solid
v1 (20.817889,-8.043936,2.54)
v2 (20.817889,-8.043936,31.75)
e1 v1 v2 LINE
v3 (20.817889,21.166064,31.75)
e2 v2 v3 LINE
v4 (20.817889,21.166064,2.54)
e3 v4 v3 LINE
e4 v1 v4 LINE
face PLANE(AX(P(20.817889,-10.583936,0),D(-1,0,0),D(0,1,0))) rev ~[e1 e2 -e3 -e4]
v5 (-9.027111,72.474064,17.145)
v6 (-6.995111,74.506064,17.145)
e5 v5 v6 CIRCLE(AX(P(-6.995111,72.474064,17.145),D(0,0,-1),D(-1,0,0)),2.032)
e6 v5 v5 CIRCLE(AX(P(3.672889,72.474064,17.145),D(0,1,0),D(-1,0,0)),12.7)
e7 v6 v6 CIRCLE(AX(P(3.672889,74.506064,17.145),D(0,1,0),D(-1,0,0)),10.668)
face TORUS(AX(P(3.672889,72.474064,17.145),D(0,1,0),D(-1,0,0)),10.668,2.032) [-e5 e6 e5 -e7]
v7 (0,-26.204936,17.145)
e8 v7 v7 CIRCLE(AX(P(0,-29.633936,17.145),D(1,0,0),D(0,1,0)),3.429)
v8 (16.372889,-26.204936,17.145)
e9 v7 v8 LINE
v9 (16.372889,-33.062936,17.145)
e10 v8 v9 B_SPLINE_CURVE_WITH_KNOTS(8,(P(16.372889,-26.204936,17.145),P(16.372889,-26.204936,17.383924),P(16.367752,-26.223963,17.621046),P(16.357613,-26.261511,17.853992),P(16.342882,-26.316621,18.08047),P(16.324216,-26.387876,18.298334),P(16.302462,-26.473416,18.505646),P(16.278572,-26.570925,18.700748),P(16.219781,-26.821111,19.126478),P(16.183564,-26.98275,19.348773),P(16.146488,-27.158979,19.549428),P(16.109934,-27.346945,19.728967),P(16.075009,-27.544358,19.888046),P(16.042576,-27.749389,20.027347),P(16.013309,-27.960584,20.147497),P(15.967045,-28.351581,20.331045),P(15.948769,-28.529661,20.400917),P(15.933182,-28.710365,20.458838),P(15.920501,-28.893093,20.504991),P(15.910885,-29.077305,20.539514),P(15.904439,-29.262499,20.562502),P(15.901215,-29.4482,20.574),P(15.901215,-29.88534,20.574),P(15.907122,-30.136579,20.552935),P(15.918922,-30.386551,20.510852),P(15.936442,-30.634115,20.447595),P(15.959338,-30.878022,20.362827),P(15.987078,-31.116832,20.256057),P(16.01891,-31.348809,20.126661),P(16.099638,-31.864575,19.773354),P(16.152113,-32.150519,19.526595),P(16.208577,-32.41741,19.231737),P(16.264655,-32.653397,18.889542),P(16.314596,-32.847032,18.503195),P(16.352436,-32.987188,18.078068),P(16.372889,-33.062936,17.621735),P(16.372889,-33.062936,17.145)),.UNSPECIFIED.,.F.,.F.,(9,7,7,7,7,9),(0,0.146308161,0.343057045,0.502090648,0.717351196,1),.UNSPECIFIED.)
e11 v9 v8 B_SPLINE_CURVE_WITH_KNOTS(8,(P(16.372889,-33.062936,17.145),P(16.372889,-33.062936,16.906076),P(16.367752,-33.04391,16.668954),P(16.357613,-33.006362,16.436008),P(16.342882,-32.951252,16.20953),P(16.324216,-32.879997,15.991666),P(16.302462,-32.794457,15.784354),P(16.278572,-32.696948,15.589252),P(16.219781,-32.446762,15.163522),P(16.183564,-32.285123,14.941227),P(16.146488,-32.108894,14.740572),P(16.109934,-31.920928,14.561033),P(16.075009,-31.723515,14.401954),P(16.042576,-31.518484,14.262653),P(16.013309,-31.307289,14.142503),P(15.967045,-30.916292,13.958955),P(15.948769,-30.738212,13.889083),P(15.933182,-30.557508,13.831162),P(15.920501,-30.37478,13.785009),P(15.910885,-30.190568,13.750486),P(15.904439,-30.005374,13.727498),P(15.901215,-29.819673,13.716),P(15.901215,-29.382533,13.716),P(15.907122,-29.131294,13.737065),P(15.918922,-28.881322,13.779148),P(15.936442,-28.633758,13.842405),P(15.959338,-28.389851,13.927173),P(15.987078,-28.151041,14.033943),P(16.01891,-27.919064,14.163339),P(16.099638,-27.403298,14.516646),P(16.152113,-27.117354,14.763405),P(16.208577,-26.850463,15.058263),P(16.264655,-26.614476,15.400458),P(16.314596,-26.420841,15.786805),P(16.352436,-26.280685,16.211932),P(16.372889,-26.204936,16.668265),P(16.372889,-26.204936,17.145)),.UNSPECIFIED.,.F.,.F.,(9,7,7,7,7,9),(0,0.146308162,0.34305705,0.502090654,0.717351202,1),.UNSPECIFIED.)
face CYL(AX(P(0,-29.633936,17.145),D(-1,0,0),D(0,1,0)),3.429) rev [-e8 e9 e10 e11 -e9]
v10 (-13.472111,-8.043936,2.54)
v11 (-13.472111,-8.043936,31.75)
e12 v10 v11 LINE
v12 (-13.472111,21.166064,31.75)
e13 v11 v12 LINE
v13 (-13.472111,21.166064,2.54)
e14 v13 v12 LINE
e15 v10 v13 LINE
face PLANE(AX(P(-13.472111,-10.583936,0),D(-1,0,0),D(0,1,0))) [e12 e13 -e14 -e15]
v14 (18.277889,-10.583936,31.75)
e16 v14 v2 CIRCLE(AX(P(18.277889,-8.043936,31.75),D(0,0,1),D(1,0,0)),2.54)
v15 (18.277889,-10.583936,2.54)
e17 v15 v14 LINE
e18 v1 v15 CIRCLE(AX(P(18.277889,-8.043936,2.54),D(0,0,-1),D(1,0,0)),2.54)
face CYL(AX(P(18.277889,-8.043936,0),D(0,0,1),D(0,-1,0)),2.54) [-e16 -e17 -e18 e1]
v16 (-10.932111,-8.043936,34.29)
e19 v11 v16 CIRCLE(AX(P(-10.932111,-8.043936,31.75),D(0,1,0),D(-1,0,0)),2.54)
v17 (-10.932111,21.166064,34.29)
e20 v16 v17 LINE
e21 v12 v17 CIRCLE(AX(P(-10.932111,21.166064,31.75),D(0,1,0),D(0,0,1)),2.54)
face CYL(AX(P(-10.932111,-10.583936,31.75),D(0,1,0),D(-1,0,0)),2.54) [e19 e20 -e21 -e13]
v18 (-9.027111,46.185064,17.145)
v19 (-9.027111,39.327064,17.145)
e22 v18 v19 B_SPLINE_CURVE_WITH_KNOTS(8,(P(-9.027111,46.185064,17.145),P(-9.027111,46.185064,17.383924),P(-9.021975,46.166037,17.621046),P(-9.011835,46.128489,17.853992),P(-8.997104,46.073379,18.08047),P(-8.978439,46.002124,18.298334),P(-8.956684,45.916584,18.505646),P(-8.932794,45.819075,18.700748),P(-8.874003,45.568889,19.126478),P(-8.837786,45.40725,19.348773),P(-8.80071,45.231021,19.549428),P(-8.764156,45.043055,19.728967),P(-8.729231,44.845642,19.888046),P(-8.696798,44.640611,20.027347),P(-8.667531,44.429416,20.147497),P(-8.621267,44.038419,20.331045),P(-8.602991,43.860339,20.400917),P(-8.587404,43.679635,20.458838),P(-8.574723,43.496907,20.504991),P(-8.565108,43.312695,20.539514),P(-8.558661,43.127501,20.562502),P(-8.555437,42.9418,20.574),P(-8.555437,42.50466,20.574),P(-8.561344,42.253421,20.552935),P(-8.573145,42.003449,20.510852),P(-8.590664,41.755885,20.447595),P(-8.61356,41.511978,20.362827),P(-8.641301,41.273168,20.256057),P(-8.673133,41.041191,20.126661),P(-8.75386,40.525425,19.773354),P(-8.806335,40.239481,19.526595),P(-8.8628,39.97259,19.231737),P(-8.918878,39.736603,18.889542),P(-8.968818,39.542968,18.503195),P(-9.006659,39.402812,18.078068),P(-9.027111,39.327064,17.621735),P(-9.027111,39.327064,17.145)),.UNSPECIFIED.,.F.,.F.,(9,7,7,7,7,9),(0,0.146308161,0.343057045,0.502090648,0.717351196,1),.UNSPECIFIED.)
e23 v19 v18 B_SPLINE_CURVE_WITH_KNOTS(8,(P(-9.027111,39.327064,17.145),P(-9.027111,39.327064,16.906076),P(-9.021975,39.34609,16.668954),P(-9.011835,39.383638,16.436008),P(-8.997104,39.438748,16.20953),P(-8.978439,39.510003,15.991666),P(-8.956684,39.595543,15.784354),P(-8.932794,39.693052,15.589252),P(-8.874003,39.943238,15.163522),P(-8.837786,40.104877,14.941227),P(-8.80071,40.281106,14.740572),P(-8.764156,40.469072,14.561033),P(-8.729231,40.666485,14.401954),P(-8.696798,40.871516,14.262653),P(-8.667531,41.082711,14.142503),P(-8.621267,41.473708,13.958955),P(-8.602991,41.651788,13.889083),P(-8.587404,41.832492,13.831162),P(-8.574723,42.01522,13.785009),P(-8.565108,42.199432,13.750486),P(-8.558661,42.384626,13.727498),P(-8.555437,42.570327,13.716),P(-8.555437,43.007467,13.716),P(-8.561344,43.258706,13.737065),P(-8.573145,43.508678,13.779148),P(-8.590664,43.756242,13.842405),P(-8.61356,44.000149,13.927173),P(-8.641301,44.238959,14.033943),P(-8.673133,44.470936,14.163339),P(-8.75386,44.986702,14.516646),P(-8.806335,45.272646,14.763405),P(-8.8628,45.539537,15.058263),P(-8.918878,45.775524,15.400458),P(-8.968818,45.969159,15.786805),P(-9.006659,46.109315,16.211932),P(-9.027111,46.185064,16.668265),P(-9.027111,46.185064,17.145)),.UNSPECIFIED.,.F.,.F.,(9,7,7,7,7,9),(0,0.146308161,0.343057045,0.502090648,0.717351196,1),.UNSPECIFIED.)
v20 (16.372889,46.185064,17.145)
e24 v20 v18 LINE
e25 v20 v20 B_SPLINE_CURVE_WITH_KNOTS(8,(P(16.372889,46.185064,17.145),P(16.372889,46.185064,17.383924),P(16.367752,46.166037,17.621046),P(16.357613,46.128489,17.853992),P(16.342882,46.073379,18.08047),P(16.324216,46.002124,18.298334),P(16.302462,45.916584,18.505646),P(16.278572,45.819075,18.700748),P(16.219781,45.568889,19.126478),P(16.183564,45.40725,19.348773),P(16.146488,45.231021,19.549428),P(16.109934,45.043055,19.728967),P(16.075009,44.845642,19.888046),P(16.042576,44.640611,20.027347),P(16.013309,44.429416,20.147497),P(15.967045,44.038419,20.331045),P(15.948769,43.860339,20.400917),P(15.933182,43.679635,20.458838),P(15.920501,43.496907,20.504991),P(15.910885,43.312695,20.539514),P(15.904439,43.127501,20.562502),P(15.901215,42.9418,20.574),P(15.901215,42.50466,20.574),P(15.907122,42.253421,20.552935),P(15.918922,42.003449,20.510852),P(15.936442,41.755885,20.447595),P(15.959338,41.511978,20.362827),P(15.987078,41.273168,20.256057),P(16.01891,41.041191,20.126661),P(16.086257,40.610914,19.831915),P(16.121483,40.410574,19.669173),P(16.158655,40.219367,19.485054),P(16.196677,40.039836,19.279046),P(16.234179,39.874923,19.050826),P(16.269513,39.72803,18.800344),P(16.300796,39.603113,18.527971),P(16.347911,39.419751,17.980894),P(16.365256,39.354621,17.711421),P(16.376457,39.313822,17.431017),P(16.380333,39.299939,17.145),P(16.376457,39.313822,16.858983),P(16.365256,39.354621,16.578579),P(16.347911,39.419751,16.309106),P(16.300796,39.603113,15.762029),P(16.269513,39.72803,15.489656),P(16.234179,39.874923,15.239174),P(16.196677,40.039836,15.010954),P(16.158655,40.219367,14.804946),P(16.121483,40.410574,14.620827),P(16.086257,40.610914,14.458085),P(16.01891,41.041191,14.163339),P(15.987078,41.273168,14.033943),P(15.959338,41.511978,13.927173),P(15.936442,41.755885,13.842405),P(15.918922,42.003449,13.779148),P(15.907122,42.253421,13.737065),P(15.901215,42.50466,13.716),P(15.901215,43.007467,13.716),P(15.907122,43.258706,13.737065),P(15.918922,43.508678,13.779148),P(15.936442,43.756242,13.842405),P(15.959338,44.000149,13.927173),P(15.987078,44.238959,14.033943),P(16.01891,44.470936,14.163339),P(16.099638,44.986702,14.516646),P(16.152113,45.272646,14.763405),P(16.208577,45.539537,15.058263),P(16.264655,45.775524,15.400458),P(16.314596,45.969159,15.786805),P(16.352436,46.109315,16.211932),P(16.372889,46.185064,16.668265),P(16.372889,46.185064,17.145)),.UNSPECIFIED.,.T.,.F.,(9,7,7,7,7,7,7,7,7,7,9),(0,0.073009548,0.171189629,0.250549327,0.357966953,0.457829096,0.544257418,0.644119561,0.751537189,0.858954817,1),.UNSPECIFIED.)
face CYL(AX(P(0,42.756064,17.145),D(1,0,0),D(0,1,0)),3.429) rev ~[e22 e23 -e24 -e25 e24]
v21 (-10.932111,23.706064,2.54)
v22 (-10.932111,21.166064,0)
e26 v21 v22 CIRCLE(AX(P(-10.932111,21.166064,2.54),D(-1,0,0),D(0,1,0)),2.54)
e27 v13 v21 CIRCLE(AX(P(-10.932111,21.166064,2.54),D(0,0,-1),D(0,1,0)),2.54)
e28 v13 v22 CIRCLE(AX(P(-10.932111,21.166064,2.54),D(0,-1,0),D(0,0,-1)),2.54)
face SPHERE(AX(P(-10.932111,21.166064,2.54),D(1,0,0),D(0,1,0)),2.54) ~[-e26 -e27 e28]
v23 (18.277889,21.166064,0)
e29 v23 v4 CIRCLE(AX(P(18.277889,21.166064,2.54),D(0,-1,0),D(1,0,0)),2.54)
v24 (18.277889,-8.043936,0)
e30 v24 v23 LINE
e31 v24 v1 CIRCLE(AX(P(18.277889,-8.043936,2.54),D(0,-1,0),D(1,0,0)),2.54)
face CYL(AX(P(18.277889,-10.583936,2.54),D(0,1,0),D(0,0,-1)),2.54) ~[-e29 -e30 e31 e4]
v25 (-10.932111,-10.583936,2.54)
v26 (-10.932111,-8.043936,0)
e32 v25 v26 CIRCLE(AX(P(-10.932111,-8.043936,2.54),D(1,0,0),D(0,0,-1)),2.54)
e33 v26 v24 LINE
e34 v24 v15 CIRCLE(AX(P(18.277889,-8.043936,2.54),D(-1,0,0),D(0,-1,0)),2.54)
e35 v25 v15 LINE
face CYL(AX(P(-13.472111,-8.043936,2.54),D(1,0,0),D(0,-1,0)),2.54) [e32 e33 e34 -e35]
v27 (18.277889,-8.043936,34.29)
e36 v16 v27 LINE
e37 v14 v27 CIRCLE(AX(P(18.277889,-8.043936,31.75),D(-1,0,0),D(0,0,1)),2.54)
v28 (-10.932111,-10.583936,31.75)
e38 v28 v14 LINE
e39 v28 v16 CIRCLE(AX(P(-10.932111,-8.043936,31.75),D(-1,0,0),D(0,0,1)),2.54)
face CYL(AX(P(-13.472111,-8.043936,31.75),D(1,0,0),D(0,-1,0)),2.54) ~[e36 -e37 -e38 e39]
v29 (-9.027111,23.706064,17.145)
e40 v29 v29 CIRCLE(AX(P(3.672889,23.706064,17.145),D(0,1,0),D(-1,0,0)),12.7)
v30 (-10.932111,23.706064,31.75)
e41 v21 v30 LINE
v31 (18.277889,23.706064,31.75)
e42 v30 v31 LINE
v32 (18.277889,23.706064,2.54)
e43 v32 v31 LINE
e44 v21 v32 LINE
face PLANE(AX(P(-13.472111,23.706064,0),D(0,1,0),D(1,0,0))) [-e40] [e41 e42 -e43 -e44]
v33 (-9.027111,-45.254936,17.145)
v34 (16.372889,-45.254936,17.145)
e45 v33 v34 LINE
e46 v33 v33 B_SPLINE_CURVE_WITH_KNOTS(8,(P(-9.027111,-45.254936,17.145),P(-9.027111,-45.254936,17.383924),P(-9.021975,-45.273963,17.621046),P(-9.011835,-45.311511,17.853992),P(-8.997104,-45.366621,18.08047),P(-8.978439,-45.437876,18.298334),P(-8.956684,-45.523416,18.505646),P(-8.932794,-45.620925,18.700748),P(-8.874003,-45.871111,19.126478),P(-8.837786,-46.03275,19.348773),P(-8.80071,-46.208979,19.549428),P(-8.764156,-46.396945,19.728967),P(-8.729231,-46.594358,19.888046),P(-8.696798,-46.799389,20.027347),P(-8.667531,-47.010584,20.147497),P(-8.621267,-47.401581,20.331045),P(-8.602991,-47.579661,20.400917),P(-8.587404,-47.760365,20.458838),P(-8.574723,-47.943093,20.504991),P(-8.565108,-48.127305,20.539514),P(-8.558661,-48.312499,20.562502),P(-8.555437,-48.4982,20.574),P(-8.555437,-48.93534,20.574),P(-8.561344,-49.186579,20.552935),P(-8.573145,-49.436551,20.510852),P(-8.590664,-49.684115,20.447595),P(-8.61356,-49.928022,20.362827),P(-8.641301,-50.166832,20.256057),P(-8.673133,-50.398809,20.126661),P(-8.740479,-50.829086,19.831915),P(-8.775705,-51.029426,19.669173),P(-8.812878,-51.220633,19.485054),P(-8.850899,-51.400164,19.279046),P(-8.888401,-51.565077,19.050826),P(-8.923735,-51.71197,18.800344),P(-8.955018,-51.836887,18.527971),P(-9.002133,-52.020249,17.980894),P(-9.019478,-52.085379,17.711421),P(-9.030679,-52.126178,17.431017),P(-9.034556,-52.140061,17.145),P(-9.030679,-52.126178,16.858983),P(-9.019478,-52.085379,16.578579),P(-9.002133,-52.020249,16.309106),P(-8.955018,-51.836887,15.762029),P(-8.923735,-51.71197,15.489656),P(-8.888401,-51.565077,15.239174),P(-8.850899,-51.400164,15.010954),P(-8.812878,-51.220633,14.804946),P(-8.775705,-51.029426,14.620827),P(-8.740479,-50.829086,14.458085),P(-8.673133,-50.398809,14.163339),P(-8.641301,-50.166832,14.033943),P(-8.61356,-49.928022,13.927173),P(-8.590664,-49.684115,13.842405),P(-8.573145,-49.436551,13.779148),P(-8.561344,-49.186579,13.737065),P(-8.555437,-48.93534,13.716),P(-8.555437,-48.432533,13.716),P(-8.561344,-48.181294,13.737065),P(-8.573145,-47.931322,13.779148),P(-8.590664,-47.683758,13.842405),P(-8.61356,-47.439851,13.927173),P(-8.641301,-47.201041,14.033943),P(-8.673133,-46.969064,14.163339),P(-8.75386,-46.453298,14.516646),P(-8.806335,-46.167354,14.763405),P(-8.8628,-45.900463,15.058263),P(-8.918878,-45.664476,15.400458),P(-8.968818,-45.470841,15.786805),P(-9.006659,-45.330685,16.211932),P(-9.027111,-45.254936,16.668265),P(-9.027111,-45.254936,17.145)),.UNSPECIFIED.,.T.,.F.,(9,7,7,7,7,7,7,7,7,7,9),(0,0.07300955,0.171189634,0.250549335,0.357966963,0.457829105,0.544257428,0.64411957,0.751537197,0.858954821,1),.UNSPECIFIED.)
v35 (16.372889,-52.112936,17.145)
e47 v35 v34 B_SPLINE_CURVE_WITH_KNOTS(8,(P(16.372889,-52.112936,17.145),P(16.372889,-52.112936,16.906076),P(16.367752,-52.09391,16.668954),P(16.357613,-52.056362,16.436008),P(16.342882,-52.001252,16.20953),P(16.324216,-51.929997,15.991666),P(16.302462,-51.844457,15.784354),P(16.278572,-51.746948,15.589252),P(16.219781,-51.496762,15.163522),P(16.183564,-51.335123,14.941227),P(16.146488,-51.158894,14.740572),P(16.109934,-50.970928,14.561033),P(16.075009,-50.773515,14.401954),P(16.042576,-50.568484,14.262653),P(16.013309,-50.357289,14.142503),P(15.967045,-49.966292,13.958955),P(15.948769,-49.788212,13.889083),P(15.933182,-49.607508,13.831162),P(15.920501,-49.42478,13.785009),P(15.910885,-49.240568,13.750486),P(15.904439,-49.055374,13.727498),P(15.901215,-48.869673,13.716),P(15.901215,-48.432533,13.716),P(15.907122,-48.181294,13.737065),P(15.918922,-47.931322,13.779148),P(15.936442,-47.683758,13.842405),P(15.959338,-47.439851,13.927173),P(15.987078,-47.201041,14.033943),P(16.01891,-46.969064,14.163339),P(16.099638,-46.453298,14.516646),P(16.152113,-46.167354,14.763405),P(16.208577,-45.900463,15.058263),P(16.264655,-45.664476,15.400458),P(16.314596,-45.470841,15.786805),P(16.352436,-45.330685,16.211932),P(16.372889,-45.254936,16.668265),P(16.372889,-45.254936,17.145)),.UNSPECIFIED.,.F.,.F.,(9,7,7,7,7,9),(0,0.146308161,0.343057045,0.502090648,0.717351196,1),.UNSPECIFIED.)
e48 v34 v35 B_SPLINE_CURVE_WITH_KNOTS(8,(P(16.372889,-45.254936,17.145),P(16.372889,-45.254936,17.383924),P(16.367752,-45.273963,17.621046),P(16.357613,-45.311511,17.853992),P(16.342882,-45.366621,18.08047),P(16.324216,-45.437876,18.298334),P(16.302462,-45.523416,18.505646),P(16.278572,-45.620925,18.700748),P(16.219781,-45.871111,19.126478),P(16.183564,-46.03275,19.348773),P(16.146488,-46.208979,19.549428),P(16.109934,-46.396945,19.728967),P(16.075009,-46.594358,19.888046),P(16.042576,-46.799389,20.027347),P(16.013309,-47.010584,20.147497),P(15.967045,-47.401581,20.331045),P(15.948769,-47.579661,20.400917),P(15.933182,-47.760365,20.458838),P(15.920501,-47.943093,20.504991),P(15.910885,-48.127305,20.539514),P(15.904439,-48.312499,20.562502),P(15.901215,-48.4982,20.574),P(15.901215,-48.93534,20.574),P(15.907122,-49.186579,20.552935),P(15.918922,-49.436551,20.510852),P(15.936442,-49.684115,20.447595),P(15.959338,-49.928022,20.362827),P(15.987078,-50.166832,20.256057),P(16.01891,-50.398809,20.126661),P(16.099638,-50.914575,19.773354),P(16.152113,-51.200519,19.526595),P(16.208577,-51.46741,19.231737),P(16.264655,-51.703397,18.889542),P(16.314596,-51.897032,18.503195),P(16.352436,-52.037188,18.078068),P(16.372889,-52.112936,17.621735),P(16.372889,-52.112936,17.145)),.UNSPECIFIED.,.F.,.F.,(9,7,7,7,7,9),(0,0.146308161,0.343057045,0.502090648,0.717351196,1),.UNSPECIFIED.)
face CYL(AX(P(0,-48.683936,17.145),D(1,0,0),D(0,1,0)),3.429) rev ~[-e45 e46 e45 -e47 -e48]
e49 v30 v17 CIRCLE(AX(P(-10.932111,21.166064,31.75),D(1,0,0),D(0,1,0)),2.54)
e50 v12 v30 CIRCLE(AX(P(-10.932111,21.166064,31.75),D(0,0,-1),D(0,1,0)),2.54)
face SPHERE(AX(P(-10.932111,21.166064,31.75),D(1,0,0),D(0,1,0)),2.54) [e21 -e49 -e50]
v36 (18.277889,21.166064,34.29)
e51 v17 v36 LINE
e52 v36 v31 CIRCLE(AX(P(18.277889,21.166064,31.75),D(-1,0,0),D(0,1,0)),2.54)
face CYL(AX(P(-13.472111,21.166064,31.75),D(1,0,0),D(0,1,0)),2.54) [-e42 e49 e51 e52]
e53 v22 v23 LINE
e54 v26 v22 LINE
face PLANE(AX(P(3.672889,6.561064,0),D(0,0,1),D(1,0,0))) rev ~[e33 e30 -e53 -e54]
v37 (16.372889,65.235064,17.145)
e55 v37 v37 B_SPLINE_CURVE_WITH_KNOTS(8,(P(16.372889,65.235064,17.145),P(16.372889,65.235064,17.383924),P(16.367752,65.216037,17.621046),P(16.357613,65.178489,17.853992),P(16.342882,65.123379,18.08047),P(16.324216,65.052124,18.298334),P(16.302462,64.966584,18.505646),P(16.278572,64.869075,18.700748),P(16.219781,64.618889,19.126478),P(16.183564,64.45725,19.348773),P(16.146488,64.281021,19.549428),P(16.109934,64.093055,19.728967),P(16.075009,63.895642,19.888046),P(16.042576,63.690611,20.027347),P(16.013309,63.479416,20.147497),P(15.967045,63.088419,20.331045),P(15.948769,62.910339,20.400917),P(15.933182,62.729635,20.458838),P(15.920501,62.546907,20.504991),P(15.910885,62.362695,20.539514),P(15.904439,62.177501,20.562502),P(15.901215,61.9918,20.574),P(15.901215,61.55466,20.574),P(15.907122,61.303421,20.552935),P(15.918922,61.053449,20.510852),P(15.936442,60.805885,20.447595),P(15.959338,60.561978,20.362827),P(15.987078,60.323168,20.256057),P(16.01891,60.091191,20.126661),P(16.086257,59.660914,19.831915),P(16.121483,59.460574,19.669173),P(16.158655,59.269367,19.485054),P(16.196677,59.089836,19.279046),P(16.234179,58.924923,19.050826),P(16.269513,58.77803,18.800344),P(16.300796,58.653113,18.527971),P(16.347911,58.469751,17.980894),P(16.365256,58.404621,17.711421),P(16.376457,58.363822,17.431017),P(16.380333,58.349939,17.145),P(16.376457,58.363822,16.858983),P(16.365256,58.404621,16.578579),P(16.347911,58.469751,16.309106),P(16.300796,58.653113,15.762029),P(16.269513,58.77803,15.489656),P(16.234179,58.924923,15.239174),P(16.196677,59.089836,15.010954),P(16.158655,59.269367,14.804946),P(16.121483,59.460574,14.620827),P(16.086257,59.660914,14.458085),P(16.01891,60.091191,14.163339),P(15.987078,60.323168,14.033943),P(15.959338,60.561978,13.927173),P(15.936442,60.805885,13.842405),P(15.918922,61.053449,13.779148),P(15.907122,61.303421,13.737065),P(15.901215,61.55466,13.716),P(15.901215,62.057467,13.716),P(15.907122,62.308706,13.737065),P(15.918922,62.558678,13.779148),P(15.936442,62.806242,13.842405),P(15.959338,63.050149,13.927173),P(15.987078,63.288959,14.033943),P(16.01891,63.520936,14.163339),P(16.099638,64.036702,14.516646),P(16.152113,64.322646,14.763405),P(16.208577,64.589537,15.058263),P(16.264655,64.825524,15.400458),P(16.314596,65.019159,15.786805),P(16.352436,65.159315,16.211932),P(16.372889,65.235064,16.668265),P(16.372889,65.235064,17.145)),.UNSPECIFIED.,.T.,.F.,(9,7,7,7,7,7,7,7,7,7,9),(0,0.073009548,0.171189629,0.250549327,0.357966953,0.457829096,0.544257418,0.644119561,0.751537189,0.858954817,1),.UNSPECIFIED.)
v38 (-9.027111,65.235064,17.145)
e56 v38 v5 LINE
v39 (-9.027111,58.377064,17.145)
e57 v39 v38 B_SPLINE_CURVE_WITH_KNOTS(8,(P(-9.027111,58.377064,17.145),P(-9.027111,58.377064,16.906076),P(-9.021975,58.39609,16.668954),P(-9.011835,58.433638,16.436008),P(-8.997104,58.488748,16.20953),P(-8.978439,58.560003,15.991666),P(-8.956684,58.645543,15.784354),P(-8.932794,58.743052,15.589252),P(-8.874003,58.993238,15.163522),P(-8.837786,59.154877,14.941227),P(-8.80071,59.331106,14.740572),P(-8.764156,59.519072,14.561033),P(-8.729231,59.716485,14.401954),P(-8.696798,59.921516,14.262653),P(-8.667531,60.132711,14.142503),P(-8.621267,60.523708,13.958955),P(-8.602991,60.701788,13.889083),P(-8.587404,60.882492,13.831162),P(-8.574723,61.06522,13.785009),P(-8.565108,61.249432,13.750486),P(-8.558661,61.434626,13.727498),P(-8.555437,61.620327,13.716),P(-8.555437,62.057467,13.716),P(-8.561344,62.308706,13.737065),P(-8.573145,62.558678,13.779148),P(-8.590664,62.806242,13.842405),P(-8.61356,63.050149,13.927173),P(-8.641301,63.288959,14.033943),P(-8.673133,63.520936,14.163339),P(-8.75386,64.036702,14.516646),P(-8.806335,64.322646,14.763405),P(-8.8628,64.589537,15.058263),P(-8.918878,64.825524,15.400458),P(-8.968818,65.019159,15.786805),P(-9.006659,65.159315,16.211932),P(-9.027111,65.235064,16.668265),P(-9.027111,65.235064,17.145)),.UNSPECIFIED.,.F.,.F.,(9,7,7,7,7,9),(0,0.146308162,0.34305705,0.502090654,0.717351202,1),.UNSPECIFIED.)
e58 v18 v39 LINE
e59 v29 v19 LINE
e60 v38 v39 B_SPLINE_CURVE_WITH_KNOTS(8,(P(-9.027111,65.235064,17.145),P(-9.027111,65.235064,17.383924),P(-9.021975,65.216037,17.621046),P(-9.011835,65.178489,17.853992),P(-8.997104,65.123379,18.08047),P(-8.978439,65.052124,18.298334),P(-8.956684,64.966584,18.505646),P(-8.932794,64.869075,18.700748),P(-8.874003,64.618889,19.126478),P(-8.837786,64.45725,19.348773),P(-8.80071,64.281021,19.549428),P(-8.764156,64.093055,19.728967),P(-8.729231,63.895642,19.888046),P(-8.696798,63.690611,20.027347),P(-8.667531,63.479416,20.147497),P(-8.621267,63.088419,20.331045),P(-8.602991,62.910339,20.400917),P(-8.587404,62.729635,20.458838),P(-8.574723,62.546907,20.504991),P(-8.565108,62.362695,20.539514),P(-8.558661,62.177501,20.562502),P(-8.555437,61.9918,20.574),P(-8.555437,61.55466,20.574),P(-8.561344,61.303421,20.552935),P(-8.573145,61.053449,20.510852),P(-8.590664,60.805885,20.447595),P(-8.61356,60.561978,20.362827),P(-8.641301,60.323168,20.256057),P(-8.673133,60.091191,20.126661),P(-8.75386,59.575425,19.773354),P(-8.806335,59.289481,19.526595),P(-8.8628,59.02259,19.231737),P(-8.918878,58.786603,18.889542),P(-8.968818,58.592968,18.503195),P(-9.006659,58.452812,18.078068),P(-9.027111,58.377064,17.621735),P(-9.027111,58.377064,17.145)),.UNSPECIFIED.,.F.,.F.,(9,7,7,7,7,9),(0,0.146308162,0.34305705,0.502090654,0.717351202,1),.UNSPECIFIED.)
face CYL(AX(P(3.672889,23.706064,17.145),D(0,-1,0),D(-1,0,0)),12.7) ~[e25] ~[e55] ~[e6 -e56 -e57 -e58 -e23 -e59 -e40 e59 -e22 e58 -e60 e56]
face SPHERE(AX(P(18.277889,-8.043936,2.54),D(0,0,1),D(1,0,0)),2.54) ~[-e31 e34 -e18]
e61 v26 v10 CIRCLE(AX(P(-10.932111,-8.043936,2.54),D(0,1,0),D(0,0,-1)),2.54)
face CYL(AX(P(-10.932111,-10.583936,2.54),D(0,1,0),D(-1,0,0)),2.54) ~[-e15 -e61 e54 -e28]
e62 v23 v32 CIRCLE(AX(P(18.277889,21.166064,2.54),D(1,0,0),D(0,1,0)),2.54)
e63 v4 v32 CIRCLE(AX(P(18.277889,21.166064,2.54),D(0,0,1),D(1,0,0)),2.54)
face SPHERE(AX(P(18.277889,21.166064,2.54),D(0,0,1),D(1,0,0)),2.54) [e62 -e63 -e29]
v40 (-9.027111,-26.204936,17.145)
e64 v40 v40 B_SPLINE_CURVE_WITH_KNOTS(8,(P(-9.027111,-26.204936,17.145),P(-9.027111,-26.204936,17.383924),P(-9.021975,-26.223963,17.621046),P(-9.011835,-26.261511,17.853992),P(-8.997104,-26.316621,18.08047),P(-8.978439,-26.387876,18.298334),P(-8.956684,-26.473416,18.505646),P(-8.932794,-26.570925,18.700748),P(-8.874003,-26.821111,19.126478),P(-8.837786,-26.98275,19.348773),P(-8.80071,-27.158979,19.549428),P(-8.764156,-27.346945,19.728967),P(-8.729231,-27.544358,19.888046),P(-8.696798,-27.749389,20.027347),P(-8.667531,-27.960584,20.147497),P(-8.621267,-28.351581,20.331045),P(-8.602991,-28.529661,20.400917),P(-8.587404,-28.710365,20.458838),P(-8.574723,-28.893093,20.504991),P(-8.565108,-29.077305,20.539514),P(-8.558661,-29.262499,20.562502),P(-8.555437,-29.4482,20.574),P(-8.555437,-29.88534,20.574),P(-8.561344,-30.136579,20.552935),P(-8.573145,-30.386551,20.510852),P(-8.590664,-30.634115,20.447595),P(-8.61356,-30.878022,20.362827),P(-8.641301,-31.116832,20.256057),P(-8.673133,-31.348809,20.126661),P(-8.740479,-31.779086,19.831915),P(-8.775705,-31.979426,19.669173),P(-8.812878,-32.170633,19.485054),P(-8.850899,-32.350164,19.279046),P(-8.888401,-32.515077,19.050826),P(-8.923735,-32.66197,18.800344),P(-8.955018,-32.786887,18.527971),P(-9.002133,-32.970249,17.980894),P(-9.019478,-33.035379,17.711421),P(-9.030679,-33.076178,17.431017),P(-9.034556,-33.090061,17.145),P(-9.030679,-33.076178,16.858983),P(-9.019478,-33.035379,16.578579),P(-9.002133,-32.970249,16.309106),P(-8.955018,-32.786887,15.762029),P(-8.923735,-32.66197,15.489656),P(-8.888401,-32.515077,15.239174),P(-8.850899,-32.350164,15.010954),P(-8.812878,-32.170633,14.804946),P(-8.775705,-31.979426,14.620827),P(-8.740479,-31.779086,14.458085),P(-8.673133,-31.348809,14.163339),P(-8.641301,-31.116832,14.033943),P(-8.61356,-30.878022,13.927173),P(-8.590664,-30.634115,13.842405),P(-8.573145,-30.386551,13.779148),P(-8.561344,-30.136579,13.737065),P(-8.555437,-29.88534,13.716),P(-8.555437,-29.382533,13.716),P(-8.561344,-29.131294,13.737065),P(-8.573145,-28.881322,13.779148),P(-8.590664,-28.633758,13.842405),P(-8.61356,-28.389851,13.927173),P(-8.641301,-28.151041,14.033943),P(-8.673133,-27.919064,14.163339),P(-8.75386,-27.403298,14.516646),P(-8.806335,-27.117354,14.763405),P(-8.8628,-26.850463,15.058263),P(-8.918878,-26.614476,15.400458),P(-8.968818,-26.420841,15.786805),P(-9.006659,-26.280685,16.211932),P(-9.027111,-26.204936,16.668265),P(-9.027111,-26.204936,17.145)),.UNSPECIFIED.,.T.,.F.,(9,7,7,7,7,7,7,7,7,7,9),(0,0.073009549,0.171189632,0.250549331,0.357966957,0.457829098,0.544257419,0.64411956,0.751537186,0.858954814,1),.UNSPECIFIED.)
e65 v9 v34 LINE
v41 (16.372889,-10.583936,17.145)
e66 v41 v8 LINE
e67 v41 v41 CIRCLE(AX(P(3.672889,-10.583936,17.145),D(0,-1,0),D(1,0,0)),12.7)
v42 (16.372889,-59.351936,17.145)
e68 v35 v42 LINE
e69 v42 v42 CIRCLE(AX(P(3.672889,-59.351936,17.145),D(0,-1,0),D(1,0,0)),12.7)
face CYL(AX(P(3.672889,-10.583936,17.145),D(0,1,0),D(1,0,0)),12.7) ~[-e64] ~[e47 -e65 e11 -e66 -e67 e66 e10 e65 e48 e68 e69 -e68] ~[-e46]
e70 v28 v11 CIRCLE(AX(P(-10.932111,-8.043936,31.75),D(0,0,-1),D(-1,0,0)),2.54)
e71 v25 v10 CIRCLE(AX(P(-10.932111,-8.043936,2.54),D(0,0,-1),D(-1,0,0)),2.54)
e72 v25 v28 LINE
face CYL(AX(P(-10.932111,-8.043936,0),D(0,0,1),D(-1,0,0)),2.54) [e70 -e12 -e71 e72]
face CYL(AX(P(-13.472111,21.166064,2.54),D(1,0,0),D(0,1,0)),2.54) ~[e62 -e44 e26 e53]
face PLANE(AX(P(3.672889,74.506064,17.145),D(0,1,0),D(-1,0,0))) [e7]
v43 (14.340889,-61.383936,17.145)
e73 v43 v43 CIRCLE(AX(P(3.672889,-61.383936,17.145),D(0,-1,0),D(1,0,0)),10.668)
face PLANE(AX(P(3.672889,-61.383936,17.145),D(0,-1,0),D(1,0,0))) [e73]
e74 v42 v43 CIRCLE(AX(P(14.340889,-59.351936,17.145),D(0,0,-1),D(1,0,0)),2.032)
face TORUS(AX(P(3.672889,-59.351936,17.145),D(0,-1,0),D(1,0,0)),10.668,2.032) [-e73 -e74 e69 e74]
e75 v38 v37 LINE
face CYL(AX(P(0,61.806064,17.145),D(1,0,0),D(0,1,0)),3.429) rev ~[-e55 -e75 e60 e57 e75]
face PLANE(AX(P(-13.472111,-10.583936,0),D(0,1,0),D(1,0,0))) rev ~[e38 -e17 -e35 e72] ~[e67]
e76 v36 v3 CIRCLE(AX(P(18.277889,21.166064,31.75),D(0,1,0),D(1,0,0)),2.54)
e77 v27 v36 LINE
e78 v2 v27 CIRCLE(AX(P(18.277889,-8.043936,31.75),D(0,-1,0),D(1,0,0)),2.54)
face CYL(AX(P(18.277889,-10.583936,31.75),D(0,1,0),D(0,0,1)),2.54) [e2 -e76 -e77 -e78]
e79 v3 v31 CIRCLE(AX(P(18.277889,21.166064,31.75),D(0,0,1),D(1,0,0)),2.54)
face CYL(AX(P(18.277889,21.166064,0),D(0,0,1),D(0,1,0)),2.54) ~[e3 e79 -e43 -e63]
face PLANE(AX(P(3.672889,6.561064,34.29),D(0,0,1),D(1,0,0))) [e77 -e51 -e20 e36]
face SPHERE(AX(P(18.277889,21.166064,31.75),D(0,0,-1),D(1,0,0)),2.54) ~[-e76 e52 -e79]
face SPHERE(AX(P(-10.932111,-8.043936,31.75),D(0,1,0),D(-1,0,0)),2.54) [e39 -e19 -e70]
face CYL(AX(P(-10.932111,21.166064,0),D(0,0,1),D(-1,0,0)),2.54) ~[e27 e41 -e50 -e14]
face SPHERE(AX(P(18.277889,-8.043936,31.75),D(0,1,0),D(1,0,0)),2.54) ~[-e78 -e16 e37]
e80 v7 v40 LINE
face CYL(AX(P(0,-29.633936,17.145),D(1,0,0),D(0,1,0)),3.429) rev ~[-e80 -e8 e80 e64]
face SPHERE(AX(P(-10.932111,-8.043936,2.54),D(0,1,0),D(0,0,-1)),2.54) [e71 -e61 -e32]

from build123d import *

# Parameters (mm, degrees)
F0_W      = 34.29
F0_H      = 34.29
F1_DEPTH  = 34.29
F3_R      = 12.7
F4_DEPTH  = 50.8
F5_R      = 3.429
F6_DEPTH  = 25.4
F7_R      = 3.429
F8_DEPTH  = 25.4
F9_R      = 3.429
F10_DEPTH = 25.4
F11_R     = 2.54
F12_R     = 12.7
F13_DEPTH = 50.8
F14_R     = 3.429
F15_DEPTH = 25.4
F16_R     = 2.032
F17_R     = 3.429
F18_DEPTH = 25.4


with BuildPart() as f1:
    # F0 (on Top) → F1 (new body)
    with BuildSketch(Plane.XY):
        with Locations((3.6728888822, 6.5610635031)):
            Rectangle(F0_W, F0_H)
    extrude(amount=F1_DEPTH)

    # F3 (on face) → F4 (join)
    with BuildSketch(Plane.XZ.offset(10.5839364969)):
        with Locations((3.6728888822, 17.145)):
            Circle(F3_R)
    extrude(amount=F4_DEPTH)

    # F5 (on Front) → F6 (cut, symmetric)
    with BuildSketch(Plane.XZ):
        with Locations((3.6728888822, 53.34)):
            Circle(F5_R)
        with Locations((3.6728888822, 72.39)):
            Circle(F5_R)
    extrude(amount=F6_DEPTH, both=True, mode=Mode.SUBTRACT)

    # F7 (on Right) → F8 (cut, symmetric)
    with BuildSketch(Plane.YZ):
        with Locations((-29.6339364969, 17.145)):
            Circle(F7_R)
        with Locations((-48.6839364969, 17.145)):
            Circle(F7_R)
    extrude(amount=F8_DEPTH, both=True, mode=Mode.SUBTRACT)

    # F9 (on Front) → F10 (cut, symmetric)
    with BuildSketch(Plane.XZ):
        with Locations((-51.5721111178, 17.145)):
            Circle(F9_R)
        with Locations((-32.5221111178, 17.145)):
            Circle(F9_R)
    extrude(amount=F10_DEPTH, both=True, mode=Mode.SUBTRACT)

    # F11
    f11_edges = [f1.edges().sort_by_distance(p)[0] for p in [
        (20.817889, 23.706064, 17.145),
        (20.817889, 6.561064, 34.29),
        (20.817889, -10.583936, 17.145),
        (20.817889, 6.561064, 0),
        (3.672889, 23.706064, 0),
        (3.672889, 23.706064, 34.29),
        (-13.472111, 23.706064, 17.145),
        (-13.472111, 6.561064, 0),
        (3.672889, -10.583936, 0),
        (-13.472111, 6.561064, 34.29),
        (-13.472111, -10.583936, 17.145),
        (3.672889, -10.583936, 34.29),
    ]]
    fillet(f11_edges, radius=F11_R)

    # F12 (on face) → F13 (join)
    with BuildSketch(Plane(origin=(0, 23.7060635031, 0), x_dir=(-1, 0, 0), z_dir=(0, 1, 0))):
        with Locations((-3.6728888822, 17.145)):
            Circle(F12_R)
    extrude(amount=F13_DEPTH)

    # F14 (on Right) → F15 (cut, symmetric)
    with BuildSketch(Plane.YZ):
        with Locations((42.7560635031, 17.145)):
            Circle(F14_R)
        with Locations((61.8060635031, 17.145)):
            Circle(F14_R)
    extrude(amount=F15_DEPTH, both=True, mode=Mode.SUBTRACT)

    # F16
    f16_edges = [f1.edges().sort_by_distance(p)[0] for p in [
        (-9.027111, -61.383936, 17.145),
        (16.372889, 74.506064, 17.145),
    ]]
    fillet(f16_edges, radius=F16_R)

    # F17 (on Front) → F18 (cut, symmetric)
    with BuildSketch(Plane.XZ):
        with Locations((58.9178888822, 17.145)):
            Circle(F17_R)
        with Locations((39.8678888822, 17.145)):
            Circle(F17_R)
    extrude(amount=F18_DEPTH, both=True, mode=Mode.SUBTRACT)


solid = f1.part
